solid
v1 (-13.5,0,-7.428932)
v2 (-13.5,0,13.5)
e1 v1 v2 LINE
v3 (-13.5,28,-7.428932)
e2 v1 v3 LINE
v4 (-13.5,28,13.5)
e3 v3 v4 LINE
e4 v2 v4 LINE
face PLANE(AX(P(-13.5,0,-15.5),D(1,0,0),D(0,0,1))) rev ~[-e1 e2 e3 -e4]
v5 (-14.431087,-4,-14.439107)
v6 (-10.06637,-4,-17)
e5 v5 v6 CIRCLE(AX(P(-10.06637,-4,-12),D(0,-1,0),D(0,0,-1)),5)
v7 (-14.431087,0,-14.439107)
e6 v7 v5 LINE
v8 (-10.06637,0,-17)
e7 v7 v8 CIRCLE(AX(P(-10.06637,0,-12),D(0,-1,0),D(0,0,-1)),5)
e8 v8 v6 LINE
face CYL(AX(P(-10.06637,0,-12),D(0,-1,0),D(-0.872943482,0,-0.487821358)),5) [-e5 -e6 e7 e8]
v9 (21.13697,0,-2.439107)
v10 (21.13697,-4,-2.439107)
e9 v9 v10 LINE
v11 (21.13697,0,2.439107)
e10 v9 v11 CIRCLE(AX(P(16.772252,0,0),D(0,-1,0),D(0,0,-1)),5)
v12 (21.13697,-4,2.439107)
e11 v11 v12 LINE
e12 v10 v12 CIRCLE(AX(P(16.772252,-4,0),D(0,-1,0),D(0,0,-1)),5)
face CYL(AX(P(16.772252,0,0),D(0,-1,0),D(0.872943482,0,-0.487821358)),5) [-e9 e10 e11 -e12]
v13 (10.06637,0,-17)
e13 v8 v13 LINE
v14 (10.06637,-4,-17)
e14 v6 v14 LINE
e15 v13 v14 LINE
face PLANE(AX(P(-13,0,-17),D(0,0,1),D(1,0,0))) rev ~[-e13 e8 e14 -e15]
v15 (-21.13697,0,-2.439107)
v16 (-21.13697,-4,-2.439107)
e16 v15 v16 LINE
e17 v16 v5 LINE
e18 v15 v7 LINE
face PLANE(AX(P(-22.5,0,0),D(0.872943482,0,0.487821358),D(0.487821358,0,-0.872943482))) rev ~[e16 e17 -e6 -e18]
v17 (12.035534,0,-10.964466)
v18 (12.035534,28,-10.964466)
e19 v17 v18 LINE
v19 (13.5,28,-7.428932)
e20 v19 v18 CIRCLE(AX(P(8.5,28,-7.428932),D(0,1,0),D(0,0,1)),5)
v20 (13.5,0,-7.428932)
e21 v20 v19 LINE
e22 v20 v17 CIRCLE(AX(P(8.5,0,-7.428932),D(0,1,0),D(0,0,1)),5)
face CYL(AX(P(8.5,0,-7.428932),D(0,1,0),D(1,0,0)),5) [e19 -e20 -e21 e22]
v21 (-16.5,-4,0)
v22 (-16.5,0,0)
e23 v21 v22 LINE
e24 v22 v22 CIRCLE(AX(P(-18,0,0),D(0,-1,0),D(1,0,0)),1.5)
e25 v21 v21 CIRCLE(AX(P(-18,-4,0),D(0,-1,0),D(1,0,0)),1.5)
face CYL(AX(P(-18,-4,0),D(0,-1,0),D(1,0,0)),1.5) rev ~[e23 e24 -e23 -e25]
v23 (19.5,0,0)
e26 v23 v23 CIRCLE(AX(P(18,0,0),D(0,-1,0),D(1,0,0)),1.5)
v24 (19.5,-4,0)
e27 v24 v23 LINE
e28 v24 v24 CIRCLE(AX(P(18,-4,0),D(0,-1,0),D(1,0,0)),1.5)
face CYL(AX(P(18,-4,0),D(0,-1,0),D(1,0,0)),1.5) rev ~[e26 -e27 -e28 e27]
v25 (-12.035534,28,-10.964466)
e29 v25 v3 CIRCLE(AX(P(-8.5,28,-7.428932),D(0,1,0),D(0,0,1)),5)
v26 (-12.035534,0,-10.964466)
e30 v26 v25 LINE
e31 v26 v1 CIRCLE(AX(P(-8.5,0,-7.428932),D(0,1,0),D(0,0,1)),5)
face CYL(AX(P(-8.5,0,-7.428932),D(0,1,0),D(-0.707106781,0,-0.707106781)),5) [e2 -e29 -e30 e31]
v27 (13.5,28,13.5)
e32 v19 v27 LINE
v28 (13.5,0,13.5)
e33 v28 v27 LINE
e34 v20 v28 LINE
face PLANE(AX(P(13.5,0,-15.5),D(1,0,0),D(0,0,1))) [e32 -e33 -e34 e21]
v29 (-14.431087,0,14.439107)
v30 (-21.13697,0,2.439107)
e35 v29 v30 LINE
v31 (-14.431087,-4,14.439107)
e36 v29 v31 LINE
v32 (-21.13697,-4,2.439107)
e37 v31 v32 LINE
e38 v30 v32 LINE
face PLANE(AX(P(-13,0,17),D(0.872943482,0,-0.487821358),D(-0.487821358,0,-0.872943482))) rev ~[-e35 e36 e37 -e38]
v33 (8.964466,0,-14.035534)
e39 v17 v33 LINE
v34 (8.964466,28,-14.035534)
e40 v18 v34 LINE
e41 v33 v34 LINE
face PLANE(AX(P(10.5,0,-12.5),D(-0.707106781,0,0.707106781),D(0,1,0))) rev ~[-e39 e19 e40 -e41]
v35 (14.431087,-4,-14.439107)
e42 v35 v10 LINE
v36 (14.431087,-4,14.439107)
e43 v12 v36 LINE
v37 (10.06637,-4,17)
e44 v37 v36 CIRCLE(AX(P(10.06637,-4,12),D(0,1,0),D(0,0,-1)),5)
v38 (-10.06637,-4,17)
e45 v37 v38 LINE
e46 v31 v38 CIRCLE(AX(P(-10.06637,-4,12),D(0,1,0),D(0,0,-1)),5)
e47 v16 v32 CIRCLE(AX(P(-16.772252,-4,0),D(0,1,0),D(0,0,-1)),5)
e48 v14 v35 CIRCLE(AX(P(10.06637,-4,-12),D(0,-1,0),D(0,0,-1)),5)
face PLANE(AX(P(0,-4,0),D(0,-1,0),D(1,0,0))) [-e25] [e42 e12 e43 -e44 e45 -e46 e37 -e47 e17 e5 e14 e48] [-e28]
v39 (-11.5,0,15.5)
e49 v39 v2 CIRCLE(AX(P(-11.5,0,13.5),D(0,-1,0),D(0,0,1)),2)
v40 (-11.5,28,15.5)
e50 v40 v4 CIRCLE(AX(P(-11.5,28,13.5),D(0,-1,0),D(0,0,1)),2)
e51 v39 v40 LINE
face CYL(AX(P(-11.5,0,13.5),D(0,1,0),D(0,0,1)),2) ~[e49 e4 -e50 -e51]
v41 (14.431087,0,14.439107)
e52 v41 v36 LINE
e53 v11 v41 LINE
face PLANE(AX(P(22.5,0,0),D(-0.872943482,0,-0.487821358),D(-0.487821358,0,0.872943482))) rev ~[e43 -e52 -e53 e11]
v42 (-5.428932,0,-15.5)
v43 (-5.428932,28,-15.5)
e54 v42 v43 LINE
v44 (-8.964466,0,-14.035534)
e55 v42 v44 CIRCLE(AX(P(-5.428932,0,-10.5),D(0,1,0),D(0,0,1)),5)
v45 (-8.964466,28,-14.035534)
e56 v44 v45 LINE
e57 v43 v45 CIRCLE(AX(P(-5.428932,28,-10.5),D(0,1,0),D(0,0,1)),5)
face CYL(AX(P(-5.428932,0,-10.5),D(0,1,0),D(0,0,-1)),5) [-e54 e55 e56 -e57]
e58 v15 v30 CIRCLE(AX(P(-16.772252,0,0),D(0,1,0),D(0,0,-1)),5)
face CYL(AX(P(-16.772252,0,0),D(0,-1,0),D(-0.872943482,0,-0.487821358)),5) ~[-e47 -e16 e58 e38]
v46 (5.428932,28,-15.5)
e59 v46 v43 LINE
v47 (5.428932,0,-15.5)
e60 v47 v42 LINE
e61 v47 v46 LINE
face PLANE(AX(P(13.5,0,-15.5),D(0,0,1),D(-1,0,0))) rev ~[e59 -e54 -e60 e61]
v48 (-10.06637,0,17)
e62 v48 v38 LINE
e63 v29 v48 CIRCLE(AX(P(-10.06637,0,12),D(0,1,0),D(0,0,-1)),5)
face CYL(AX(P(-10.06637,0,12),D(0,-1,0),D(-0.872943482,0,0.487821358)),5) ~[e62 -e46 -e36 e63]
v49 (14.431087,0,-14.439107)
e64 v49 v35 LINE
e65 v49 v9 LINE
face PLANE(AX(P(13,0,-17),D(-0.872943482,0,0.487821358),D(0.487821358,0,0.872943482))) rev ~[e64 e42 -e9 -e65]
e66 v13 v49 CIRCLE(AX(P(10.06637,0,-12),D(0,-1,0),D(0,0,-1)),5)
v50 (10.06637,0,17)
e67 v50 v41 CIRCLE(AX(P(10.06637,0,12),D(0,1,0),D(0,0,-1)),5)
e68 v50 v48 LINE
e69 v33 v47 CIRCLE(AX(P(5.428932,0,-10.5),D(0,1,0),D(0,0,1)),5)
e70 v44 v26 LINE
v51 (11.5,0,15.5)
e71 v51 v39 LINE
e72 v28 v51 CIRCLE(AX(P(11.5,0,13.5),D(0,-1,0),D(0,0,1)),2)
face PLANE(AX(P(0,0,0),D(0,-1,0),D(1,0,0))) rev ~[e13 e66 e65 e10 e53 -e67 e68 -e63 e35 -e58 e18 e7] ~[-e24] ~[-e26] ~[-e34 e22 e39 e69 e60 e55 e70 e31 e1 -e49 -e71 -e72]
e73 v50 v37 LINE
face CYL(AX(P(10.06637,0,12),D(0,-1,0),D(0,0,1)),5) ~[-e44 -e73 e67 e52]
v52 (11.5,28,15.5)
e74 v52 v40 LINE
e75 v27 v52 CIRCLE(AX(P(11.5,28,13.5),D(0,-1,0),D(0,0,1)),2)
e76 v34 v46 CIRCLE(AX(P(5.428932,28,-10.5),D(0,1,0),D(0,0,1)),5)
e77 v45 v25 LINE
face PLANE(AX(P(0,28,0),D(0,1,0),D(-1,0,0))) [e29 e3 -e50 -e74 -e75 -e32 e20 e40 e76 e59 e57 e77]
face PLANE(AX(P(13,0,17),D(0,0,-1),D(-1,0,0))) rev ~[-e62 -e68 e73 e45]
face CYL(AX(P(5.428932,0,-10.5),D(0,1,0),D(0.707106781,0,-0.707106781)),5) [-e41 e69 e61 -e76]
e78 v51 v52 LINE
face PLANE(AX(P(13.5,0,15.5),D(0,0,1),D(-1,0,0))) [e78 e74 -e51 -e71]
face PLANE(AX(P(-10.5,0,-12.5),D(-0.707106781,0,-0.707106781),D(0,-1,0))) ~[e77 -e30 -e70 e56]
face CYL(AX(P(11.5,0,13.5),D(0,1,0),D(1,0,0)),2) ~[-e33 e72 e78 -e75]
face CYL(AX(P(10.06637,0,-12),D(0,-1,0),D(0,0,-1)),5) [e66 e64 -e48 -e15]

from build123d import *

# Parameters (mm, degrees)
F1_DEPTH = 4
F2_W     = 27
F2_H     = 31
F3_DEPTH = 28
F4_R     = 2
F5_R     = 5
F6_R     = 1.5
F7_DEPTH = 25
F8_SIZE  = 6
F9_R     = 5
F10_R    = 5


with BuildPart() as f1:
    # F0 (on Front) → F1 (new body)
    with BuildSketch(Plane.XZ):
        Polygon((-13, -17), (13, -17), (22.5, 0), (13, 17), (-13, 17), (-22.5, 0), align=None)
    extrude(amount=F1_DEPTH)

    # F2 (on face) → F3 (join)
    with BuildSketch(Plane(origin=(0, 0, 0), x_dir=(-1, 0, 0), z_dir=(0, 1, 0))):
        Rectangle(F2_W, F2_H)
    extrude(amount=F3_DEPTH)

    # F4
    f4_edges = [f1.edges().sort_by_distance(p)[0] for p in [
        (-13.5, 14, 15.5),
        (13.5, 14, 15.5),
    ]]
    fillet(f4_edges, radius=F4_R)

    # F5
    f5_edges = [f1.edges().sort_by_distance(p)[0] for p in [
        (-22.5, -2, 0),
        (22.5, -2, 0),
    ]]
    fillet(f5_edges, radius=F5_R)

    # F6 (on face) → F7 (cut)
    with BuildSketch(Plane.XZ.offset(4)):
        with Locations((-18, 0)):
            Circle(F6_R)
        with Locations((18, 0)):
            Circle(F6_R)
    extrude(amount=-F7_DEPTH, mode=Mode.SUBTRACT)

    # F8
    f8_edges = [f1.edges().sort_by_distance(p)[0] for p in [
        (13.5, 14, -15.5),
        (-13.5, 14, -15.5),
    ]]
    chamfer(f8_edges, length=F8_SIZE)

    # F9
    f9_edges = [f1.edges().sort_by_distance(p)[0] for p in [
        (13, -2, 17),
        (-13, -2, 17),
        (13, -2, -17),
        (-13, -2, -17),
    ]]
    fillet(f9_edges, radius=F9_R)

    # F10
    f10_edges = [f1.edges().sort_by_distance(p)[0] for p in [
        (-13.5, 14, -9.5),
        (-7.5, 14, -15.5),
        (7.5, 14, -15.5),
        (13.5, 14, -9.5),
    ]]
    fillet(f10_edges, radius=F10_R)


solid = f1.part
